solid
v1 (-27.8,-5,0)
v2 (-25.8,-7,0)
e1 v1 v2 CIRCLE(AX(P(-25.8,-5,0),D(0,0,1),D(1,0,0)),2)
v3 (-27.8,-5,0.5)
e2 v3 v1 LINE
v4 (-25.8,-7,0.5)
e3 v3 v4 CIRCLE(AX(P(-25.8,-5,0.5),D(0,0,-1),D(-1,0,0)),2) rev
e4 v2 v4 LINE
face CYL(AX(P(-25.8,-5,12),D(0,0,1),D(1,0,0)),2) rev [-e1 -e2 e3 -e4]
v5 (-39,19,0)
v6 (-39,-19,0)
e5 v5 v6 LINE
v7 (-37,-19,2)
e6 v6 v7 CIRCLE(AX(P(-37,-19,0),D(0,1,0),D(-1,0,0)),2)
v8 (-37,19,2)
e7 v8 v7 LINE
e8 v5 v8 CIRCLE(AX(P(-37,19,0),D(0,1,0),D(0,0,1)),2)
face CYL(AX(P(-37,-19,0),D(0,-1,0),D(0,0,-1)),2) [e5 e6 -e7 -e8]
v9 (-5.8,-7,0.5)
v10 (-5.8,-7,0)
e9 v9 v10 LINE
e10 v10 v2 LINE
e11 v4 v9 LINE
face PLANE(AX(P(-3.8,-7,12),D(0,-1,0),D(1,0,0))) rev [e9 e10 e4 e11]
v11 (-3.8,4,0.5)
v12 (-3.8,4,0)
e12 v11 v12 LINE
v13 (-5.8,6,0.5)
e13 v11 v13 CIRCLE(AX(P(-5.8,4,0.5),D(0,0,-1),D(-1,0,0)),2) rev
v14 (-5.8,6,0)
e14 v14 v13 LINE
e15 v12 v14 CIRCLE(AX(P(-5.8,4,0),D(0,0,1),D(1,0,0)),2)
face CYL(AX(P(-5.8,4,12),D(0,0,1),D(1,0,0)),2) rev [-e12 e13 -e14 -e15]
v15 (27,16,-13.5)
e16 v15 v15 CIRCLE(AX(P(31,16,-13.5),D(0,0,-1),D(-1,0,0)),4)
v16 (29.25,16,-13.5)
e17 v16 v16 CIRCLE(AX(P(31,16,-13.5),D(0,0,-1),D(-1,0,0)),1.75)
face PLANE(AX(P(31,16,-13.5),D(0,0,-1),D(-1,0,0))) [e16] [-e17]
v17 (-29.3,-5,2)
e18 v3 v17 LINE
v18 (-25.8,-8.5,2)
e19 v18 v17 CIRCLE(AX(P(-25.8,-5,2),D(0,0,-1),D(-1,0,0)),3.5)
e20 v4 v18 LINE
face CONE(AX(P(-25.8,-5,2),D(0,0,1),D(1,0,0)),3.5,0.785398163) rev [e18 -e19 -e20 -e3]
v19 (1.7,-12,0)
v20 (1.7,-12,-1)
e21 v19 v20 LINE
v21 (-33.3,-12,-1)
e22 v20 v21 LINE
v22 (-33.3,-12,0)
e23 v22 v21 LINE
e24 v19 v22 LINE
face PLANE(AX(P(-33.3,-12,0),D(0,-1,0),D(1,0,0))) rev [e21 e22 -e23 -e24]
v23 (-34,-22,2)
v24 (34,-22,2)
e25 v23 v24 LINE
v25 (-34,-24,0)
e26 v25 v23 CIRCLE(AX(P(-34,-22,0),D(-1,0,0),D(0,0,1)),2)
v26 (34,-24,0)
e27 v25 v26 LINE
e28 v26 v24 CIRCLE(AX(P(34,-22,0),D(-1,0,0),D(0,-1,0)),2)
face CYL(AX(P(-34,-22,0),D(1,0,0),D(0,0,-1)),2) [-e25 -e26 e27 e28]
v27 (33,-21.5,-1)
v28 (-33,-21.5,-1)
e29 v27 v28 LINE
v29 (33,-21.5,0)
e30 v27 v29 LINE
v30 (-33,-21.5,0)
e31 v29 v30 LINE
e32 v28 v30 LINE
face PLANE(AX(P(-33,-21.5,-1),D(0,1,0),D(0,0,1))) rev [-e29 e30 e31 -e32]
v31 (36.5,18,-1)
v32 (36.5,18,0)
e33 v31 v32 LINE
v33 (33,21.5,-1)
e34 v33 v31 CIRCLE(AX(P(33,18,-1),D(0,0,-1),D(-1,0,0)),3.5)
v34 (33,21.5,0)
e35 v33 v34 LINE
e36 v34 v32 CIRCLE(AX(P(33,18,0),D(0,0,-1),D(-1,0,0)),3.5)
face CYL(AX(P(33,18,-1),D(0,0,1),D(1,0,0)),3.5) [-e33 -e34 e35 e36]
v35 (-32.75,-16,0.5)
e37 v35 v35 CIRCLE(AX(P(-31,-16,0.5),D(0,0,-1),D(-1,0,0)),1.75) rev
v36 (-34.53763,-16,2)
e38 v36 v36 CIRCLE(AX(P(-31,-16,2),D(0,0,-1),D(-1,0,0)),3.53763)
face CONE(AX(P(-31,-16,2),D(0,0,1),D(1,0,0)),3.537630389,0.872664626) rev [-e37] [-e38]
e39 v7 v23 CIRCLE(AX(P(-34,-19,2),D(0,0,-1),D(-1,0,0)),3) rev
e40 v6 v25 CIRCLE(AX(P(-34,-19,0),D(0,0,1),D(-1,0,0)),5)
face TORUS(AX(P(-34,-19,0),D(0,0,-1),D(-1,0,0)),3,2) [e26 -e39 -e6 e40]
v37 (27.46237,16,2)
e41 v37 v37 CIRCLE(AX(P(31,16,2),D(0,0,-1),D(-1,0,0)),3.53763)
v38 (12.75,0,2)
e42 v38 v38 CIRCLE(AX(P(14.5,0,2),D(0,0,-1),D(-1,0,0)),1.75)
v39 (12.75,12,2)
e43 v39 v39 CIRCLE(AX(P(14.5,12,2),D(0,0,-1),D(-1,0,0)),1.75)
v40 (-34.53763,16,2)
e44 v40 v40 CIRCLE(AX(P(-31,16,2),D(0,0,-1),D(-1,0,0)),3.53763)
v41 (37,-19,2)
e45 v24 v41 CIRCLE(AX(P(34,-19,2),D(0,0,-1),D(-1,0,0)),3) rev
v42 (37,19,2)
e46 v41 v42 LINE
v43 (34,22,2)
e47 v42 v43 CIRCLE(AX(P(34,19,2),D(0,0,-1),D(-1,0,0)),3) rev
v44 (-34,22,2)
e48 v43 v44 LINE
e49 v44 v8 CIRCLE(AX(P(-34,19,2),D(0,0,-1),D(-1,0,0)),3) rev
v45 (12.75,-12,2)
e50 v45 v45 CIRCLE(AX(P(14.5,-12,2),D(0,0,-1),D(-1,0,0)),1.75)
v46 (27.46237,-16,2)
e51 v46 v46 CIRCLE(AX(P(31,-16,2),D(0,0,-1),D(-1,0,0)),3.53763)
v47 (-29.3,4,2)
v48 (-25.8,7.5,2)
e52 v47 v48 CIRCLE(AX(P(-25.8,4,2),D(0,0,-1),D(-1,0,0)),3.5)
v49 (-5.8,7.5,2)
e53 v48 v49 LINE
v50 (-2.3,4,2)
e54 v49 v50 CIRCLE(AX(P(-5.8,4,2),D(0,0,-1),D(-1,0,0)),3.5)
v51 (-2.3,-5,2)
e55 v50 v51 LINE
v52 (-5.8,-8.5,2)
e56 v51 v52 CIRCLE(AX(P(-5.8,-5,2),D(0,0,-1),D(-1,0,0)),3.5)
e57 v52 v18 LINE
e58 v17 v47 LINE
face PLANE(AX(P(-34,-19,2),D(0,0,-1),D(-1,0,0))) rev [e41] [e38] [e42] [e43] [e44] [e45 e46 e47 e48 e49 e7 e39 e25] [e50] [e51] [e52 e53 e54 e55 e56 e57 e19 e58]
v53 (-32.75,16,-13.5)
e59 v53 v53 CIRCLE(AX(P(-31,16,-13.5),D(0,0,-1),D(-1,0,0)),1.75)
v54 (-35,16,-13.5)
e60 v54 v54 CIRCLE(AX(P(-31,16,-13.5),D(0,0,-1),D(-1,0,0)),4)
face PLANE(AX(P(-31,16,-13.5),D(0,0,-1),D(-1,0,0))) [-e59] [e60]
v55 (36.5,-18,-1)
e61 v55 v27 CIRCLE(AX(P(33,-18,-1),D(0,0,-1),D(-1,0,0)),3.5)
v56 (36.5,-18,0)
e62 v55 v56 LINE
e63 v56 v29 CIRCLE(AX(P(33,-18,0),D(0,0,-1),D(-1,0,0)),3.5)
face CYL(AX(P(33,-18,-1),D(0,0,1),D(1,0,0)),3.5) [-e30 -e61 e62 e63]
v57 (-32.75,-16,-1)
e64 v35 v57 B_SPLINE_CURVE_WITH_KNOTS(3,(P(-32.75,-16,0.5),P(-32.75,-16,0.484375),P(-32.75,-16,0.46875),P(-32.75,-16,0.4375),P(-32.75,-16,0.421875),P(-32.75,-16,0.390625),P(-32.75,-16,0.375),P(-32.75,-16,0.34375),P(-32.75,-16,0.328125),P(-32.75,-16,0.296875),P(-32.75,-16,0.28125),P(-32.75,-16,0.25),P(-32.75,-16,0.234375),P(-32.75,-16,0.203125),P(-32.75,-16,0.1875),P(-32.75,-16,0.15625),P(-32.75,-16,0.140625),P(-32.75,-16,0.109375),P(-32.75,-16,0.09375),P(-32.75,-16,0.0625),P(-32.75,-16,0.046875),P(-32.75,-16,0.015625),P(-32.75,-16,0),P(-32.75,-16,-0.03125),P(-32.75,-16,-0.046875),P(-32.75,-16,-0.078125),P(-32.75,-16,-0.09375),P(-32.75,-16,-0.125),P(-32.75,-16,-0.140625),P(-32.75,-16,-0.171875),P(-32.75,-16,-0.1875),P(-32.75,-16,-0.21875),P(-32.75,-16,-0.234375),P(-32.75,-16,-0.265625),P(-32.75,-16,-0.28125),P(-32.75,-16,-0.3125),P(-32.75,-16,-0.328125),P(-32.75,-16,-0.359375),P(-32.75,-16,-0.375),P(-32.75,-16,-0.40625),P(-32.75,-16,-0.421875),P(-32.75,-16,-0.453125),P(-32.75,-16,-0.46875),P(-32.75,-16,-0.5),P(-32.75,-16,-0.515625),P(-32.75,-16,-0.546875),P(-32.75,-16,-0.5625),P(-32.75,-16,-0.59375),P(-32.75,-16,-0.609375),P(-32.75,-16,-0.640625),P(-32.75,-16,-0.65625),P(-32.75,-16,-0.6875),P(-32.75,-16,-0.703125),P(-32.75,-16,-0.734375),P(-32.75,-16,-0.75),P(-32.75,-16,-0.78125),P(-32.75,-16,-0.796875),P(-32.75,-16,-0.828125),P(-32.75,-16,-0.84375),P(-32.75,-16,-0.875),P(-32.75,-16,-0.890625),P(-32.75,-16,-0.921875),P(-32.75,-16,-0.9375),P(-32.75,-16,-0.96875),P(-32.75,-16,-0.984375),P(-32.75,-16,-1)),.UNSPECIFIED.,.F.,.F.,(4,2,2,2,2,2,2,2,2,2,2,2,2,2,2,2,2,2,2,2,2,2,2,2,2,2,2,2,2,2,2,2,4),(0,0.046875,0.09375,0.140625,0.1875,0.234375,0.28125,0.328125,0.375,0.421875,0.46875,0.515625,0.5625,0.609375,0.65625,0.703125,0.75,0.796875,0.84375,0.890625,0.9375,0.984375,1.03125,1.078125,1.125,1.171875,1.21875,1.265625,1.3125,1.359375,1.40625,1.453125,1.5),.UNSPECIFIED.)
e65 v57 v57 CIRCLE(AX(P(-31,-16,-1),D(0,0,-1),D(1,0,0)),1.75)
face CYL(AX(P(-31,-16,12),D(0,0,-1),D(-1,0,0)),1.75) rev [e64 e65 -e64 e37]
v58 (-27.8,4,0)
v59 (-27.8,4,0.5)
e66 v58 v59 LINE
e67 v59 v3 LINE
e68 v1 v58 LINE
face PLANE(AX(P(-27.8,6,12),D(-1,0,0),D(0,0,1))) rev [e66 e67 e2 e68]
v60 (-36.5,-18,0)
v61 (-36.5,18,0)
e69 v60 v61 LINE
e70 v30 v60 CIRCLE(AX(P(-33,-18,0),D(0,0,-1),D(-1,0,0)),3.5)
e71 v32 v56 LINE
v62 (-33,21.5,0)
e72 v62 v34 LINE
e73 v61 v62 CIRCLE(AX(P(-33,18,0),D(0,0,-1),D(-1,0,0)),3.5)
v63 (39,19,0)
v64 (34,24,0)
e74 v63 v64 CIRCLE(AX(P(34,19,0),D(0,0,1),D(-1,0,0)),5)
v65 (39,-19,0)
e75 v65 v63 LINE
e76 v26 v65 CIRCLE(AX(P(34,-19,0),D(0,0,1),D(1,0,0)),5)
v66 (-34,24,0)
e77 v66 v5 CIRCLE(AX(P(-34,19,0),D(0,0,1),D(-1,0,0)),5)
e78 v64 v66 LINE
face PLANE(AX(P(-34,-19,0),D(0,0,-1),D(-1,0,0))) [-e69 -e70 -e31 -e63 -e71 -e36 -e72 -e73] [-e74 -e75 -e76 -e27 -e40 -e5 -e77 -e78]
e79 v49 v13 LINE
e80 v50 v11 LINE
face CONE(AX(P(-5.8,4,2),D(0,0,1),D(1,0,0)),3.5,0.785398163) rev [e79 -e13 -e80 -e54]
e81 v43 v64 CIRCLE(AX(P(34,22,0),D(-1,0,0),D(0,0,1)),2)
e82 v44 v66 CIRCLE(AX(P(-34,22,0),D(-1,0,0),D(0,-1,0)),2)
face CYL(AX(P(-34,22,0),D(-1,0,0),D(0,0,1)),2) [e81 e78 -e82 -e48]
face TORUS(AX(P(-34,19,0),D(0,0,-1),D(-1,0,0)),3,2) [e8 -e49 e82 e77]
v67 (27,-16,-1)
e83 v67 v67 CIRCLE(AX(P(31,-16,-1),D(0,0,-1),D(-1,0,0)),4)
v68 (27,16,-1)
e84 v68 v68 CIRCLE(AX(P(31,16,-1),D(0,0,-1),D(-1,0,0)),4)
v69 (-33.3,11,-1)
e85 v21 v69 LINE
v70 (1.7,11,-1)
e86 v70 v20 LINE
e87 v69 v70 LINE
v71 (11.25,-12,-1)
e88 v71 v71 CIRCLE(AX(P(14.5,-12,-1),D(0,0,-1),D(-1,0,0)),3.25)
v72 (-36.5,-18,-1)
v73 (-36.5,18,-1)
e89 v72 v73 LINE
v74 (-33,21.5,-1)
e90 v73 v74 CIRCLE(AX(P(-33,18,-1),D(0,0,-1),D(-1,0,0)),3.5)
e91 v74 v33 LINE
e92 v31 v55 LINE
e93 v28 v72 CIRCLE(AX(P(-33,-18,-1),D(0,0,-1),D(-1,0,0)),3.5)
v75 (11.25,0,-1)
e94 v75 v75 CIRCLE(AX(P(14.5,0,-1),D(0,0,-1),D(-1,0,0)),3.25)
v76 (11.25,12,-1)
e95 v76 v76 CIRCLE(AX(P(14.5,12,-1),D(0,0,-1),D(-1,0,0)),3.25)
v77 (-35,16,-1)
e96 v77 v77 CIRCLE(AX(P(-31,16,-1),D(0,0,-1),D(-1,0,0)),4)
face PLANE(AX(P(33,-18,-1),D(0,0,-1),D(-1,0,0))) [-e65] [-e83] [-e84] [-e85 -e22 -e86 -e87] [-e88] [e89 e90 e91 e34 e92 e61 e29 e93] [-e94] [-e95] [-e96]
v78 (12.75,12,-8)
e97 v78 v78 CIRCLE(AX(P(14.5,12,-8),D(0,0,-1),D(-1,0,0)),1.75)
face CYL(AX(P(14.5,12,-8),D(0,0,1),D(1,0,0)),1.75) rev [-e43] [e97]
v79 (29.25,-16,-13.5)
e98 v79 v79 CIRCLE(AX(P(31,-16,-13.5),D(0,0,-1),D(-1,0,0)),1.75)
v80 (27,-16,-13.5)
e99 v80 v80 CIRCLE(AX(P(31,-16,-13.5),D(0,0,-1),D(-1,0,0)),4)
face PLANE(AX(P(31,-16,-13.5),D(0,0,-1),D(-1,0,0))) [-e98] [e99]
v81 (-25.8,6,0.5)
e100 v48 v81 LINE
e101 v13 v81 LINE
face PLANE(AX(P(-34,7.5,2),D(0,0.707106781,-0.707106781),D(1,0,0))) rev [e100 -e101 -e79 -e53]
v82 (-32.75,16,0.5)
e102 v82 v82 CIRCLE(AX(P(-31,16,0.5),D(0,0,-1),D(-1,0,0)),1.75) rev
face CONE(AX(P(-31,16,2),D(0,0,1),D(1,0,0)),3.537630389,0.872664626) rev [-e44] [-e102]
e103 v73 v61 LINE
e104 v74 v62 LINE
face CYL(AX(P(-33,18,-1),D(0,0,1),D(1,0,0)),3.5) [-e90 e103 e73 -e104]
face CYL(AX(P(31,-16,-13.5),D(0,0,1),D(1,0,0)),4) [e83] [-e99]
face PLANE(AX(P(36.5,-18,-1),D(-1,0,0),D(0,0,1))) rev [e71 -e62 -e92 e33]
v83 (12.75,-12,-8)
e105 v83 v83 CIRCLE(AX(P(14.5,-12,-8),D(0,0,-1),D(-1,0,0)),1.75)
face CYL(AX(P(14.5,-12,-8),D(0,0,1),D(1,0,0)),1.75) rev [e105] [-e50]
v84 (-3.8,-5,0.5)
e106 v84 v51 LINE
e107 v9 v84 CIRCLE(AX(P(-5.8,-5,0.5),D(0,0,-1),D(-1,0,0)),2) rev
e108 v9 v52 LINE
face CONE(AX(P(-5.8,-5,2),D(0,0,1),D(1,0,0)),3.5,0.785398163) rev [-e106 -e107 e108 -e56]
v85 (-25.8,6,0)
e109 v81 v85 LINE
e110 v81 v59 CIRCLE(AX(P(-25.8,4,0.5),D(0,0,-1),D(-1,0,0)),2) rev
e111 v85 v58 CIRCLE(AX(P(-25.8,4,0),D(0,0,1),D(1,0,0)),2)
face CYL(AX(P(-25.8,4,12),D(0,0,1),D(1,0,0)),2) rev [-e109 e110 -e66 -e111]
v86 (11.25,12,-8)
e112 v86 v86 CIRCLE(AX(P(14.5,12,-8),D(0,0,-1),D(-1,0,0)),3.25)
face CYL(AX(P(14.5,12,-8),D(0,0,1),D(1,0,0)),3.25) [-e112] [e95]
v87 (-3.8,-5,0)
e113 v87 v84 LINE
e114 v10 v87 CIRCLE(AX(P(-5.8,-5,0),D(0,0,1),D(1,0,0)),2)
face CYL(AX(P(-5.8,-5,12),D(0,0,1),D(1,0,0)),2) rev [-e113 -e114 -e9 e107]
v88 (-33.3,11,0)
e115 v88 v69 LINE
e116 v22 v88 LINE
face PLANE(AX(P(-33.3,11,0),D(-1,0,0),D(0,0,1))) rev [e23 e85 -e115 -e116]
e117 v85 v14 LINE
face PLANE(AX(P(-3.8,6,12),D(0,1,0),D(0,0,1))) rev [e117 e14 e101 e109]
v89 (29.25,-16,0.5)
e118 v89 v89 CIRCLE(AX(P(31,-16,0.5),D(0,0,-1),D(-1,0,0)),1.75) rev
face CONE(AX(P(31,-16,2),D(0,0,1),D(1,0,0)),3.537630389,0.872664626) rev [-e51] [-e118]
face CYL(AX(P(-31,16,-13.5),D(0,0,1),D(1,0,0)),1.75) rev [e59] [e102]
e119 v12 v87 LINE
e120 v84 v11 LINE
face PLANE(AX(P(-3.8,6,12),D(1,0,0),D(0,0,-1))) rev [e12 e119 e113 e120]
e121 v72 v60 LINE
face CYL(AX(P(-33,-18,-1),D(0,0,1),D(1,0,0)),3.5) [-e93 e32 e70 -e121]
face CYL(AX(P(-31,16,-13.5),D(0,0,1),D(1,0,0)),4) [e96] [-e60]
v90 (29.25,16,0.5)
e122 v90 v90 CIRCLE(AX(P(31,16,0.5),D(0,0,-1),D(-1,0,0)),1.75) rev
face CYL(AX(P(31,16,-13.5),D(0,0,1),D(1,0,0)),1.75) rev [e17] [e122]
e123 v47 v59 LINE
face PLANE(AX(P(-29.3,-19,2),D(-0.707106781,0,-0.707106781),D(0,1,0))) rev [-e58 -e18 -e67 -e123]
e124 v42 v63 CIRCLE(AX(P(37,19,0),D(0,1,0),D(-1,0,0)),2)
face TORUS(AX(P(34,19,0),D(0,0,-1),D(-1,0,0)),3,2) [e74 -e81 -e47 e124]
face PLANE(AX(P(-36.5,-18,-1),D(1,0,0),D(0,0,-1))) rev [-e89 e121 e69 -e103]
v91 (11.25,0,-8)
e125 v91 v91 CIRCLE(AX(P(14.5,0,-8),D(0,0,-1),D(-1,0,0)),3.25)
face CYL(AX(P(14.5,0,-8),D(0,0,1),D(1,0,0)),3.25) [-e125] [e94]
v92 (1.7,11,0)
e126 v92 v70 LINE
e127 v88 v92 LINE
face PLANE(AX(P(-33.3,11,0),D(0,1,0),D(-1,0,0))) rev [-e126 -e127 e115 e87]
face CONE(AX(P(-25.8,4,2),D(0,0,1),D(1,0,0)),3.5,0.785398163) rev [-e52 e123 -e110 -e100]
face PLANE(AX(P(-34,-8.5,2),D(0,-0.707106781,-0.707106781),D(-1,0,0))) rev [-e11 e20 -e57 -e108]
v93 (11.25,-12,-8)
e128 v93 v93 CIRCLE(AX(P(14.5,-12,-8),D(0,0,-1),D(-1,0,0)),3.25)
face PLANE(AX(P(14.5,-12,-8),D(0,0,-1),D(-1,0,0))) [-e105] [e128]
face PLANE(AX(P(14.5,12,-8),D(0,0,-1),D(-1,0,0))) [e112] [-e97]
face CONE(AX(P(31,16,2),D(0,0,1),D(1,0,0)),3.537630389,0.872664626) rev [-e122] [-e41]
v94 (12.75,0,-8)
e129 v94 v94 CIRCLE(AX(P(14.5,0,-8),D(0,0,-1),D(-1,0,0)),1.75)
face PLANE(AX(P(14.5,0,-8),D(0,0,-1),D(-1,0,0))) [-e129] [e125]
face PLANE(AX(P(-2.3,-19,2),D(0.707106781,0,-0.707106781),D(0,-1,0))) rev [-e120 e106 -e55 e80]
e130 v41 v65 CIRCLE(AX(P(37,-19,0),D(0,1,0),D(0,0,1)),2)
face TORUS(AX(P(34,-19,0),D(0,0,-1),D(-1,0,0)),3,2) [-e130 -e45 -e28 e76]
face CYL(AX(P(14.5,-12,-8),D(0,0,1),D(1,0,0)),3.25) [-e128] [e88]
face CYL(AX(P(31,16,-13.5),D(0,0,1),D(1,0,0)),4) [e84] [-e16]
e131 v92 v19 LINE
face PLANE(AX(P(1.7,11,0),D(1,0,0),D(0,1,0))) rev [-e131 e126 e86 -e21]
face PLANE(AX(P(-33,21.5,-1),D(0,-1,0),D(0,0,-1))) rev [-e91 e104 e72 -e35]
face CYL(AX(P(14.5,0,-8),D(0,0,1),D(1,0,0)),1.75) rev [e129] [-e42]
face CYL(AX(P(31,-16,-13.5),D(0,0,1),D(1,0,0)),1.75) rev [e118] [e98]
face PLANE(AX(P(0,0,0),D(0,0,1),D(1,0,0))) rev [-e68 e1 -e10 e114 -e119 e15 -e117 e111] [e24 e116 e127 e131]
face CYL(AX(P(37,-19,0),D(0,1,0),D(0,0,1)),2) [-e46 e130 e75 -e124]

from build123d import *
from OCP.BRepFilletAPI import BRepFilletAPI_MakeChamfer

# Parameters (mm, degrees)
ESTRUSIONE_ESTRUSIONE1_DEPTH = 2
ESTRUSIONE_ESTRUSIONE2_DEPTH = 1
SCHIZZO3_R                   = 4
SCHIZZO3_R_2                 = 1.75
ESTRUSIONE_ESTRUSIONE3_DEPTH = 12.5
TAGLIO_ESTRUSIONE1_START     = -13
SCHIZZO4_R                   = 1.75
TAGLIO_ESTRUSIONE1_DEPTH     = 13
SCHIZZO5_W                   = 24
SCHIZZO5_H                   = 13
TAGLIO_ESTRUSIONE2_DEPTH     = 13
SCHIZZO6_W                   = 35
SCHIZZO6_H                   = 23
TAGLIO_ESTRUSIONE3_DEPTH     = 1
RACCORDO1_R                  = 2
RACCORDO2_R                  = 2
SMUSSO1_SIZE                 = 1.5
SMUSSO2_SIZE                 = 1.5
SMUSSO2_SIZE2                = 1.787630389
SCHIZZO7_R                   = 3.25
SCHIZZO7_R_2                 = 1.75
ESTRUSIONE_ESTRUSIONE4_DEPTH = 7
TAGLIO_ESTRUSIONE4_START     = -10
SCHIZZO8_R                   = 1.75
TAGLIO_ESTRUSIONE4_DEPTH     = 10


with BuildPart() as part:
    # Schizzo1 → Estrusione-Estrusione1 (new body)
    with BuildSketch(Plane.XY):
        with BuildLine():
            Line((-34, -24), (34, -24))
            ThreePointArc((34, -24), (37.535533906, -22.535533906), (39, -19))
            Line((39, -19), (39, 19))
            ThreePointArc((39, 19), (37.535533906, 22.535533906), (34, 24))
            Line((34, 24), (-34, 24))
            ThreePointArc((-34, 24), (-37.535533906, 22.535533906), (-39, 19))
            Line((-39, 19), (-39, -19))
            ThreePointArc((-39, -19), (-37.535533906, -22.535533906), (-34, -24))
        make_face()
    extrude(amount=ESTRUSIONE_ESTRUSIONE1_DEPTH)

    # Schizzo2 → Estrusione-Estrusione2 (add)
    with BuildSketch(Plane(origin=(0, 0, 0), x_dir=(-1, 0, 0), z_dir=(0, 0, -1))):
        with BuildLine():
            Line((-36.5, -18), (-36.5, 18))
            ThreePointArc((-36.5, 18), (-35.474873734, 20.474873734), (-33, 21.5))
            Line((-33, 21.5), (33, 21.5))
            ThreePointArc((33, 21.5), (35.474873734, 20.474873734), (36.5, 18))
            Line((36.5, 18), (36.5, -18))
            ThreePointArc((36.5, -18), (35.474873734, -20.474873734), (33, -21.5))
            Line((33, -21.5), (-33, -21.5))
            ThreePointArc((-33, -21.5), (-35.474873734, -20.474873734), (-36.5, -18))
        make_face()
    extrude(amount=ESTRUSIONE_ESTRUSIONE2_DEPTH)

    # Schizzo3 → Estrusione-Estrusione3 (add)
    # profile 1 of 3: a face of its own
    with BuildSketch(Plane(origin=(0, 0, -1), x_dir=(-1, 0, 0), z_dir=(0, 0, -1))):
        with Locations((-31, 16)):
            Circle(SCHIZZO3_R)
        with Locations((-31, 16)):
            Circle(SCHIZZO3_R_2, mode=Mode.SUBTRACT)
    # profile 2 of 3: a face of its own
    with BuildSketch(Plane(origin=(0, 0, -1), x_dir=(-1, 0, 0), z_dir=(0, 0, -1))):
        with Locations((-31, -16)):
            Circle(SCHIZZO3_R)
        with Locations((-31, -16)):
            Circle(SCHIZZO3_R_2, mode=Mode.SUBTRACT)
    # profile 3 of 3: a face of its own
    with BuildSketch(Plane(origin=(0, 0, -1), x_dir=(-1, 0, 0), z_dir=(0, 0, -1))):
        with Locations((31, 16)):
            Circle(SCHIZZO3_R)
        with Locations((31, 16)):
            Circle(SCHIZZO3_R_2, mode=Mode.SUBTRACT)
    extrude(amount=ESTRUSIONE_ESTRUSIONE3_DEPTH)

    # Schizzo4 → Taglio-Estrusione1 (cut)
    with BuildSketch(Plane(origin=(0, 0, -1), x_dir=(-1, 0, 0), z_dir=(0, 0, -1)).offset(TAGLIO_ESTRUSIONE1_START)):
        with Locations((-31, -16)):
            Circle(SCHIZZO4_R)
        with Locations((-31, 16)):
            Circle(SCHIZZO4_R)
        with Locations((31, 16)):
            Circle(SCHIZZO4_R)
        with Locations((31, -16)):
            Circle(SCHIZZO4_R)
    extrude(amount=TAGLIO_ESTRUSIONE1_DEPTH, mode=Mode.SUBTRACT)

    # Schizzo5 → Taglio-Estrusione2 (cut)
    with BuildSketch(Plane(origin=(0, 0, -1), x_dir=(-1, 0, 0), z_dir=(0, 0, -1))):
        with Locations((15.8, -0.5)):
            Rectangle(SCHIZZO5_W, SCHIZZO5_H)
    extrude(amount=-TAGLIO_ESTRUSIONE2_DEPTH, mode=Mode.SUBTRACT)

    # Schizzo6 → Taglio-Estrusione3 (cut)
    with BuildSketch(Plane(origin=(0, 0, -1), x_dir=(-1, 0, 0), z_dir=(0, 0, -1))):
        with Locations((15.8, -0.5)):
            Rectangle(SCHIZZO6_W, SCHIZZO6_H)
    extrude(amount=-TAGLIO_ESTRUSIONE3_DEPTH, mode=Mode.SUBTRACT)

    # Raccordo1
    raccordo1_edges = [part.edges().sort_by_distance(p)[0] for p in [
        (-37.535533906, 22.535533906, 2),
        (0, 24, 2),
        (37.535533906, 22.535533906, 2),
        (39, 0, 2),
        (37.535533906, -22.535533906, 2),
        (0, -24, 2),
        (-37.535533906, -22.535533906, 2),
        (-39, 0, 2),
    ]]
    fillet(raccordo1_edges, radius=RACCORDO1_R - 0.0001)  # a hair under: the kernel refuses the full size

    # Raccordo2
    raccordo2_edges = [part.edges().sort_by_distance(p)[0] for p in [
        (-3.8, -7, 1),
        (-3.8, 6, 1),
        (-27.8, 6, 1),
        (-27.8, -7, 1),
    ]]
    fillet(raccordo2_edges, radius=RACCORDO2_R)

    # Smusso1
    smusso1_edges = [part.edges().sort_by_distance(p)[0] for p in [
        (-27.8, -0.5, 2),
        (-15.8, -7, 2),
        (-3.8, -0.5, 2),
        (-15.8, 6, 2),
        (-27.214213562, -6.414213562, 2),
        (-4.385786438, -6.414213562, 2),
        (-4.385786438, 5.414213562, 2),
        (-27.214213562, 5.414213562, 2),
    ]]
    chamfer(smusso1_edges, length=SMUSSO1_SIZE)

    # Smusso2: one chamfer whose edges measure the first distance from different faces: ONE call of the kernel's chamfer builder (chamfer() names one face for all edges)
    smusso2_edges_1 = [part.edges().sort_by_distance(p)[0] for p in [
        (-29.25, -16, 2),
    ]]
    smusso2_side_1 = [part.faces().sort_by_distance(p)[0] for p in [
        (-29.25, -16, 0.5),
    ]]
    smusso2_edges_2 = [part.edges().sort_by_distance(p)[0] for p in [
        (-29.25, 16, 2),
    ]]
    smusso2_side_2 = [part.faces().sort_by_distance(p)[0] for p in [
        (-29.25, 16, -5.75),
    ]]
    smusso2_edges_3 = [part.edges().sort_by_distance(p)[0] for p in [
        (32.75, 16, 2),
    ]]
    smusso2_side_3 = [part.faces().sort_by_distance(p)[0] for p in [
        (32.75, 16, -5.75),
    ]]
    smusso2_edges_4 = [part.edges().sort_by_distance(p)[0] for p in [
        (32.75, -16, 2),
    ]]
    smusso2_side_4 = [part.faces().sort_by_distance(p)[0] for p in [
        (32.75, -16, -5.75),
    ]]
    smusso2 = BRepFilletAPI_MakeChamfer(part.part.solid().wrapped)
    for e in smusso2_edges_1:
        smusso2.Add(SMUSSO2_SIZE, SMUSSO2_SIZE2, e.wrapped, smusso2_side_1[0].wrapped)  # the first distance lies on this face
    for e in smusso2_edges_2:
        smusso2.Add(SMUSSO2_SIZE, SMUSSO2_SIZE2, e.wrapped, smusso2_side_2[0].wrapped)  # the first distance lies on this face
    for e in smusso2_edges_3:
        smusso2.Add(SMUSSO2_SIZE, SMUSSO2_SIZE2, e.wrapped, smusso2_side_3[0].wrapped)  # the first distance lies on this face
    for e in smusso2_edges_4:
        smusso2.Add(SMUSSO2_SIZE, SMUSSO2_SIZE2, e.wrapped, smusso2_side_4[0].wrapped)  # the first distance lies on this face
    add(Compound.cast(smusso2.Shape()), mode=Mode.REPLACE)

    # Schizzo7 → Estrusione-Estrusione4 (add)
    # profile 1 of 3: a face of its own
    with BuildSketch(Plane(origin=(0, 0, -1), x_dir=(-1, 0, 0), z_dir=(0, 0, -1))):
        with Locations((-14.5, 12)):
            Circle(SCHIZZO7_R)
        with Locations((-14.5, 12)):
            Circle(SCHIZZO7_R_2, mode=Mode.SUBTRACT)
    # profile 2 of 3: a face of its own
    with BuildSketch(Plane(origin=(0, 0, -1), x_dir=(-1, 0, 0), z_dir=(0, 0, -1))):
        with Locations((-14.5, 0)):
            Circle(SCHIZZO7_R)
        with Locations((-14.5, 0)):
            Circle(SCHIZZO7_R_2, mode=Mode.SUBTRACT)
    # profile 3 of 3: a face of its own
    with BuildSketch(Plane(origin=(0, 0, -1), x_dir=(-1, 0, 0), z_dir=(0, 0, -1))):
        with Locations((-14.5, -12)):
            Circle(SCHIZZO7_R)
        with Locations((-14.5, -12)):
            Circle(SCHIZZO7_R_2, mode=Mode.SUBTRACT)
    extrude(amount=ESTRUSIONE_ESTRUSIONE4_DEPTH)

    # Schizzo8 → Taglio-Estrusione4 (cut)
    with BuildSketch(Plane(origin=(0, 0, -1), x_dir=(-1, 0, 0), z_dir=(0, 0, -1)).offset(TAGLIO_ESTRUSIONE4_START)):
        with Locations((-14.5, 12)):
            Circle(SCHIZZO8_R)
        with Locations((-14.5, 0)):
            Circle(SCHIZZO8_R)
        with Locations((-14.5, -12)):
            Circle(SCHIZZO8_R)
    extrude(amount=TAGLIO_ESTRUSIONE4_DEPTH, mode=Mode.SUBTRACT)


solid = part.part
